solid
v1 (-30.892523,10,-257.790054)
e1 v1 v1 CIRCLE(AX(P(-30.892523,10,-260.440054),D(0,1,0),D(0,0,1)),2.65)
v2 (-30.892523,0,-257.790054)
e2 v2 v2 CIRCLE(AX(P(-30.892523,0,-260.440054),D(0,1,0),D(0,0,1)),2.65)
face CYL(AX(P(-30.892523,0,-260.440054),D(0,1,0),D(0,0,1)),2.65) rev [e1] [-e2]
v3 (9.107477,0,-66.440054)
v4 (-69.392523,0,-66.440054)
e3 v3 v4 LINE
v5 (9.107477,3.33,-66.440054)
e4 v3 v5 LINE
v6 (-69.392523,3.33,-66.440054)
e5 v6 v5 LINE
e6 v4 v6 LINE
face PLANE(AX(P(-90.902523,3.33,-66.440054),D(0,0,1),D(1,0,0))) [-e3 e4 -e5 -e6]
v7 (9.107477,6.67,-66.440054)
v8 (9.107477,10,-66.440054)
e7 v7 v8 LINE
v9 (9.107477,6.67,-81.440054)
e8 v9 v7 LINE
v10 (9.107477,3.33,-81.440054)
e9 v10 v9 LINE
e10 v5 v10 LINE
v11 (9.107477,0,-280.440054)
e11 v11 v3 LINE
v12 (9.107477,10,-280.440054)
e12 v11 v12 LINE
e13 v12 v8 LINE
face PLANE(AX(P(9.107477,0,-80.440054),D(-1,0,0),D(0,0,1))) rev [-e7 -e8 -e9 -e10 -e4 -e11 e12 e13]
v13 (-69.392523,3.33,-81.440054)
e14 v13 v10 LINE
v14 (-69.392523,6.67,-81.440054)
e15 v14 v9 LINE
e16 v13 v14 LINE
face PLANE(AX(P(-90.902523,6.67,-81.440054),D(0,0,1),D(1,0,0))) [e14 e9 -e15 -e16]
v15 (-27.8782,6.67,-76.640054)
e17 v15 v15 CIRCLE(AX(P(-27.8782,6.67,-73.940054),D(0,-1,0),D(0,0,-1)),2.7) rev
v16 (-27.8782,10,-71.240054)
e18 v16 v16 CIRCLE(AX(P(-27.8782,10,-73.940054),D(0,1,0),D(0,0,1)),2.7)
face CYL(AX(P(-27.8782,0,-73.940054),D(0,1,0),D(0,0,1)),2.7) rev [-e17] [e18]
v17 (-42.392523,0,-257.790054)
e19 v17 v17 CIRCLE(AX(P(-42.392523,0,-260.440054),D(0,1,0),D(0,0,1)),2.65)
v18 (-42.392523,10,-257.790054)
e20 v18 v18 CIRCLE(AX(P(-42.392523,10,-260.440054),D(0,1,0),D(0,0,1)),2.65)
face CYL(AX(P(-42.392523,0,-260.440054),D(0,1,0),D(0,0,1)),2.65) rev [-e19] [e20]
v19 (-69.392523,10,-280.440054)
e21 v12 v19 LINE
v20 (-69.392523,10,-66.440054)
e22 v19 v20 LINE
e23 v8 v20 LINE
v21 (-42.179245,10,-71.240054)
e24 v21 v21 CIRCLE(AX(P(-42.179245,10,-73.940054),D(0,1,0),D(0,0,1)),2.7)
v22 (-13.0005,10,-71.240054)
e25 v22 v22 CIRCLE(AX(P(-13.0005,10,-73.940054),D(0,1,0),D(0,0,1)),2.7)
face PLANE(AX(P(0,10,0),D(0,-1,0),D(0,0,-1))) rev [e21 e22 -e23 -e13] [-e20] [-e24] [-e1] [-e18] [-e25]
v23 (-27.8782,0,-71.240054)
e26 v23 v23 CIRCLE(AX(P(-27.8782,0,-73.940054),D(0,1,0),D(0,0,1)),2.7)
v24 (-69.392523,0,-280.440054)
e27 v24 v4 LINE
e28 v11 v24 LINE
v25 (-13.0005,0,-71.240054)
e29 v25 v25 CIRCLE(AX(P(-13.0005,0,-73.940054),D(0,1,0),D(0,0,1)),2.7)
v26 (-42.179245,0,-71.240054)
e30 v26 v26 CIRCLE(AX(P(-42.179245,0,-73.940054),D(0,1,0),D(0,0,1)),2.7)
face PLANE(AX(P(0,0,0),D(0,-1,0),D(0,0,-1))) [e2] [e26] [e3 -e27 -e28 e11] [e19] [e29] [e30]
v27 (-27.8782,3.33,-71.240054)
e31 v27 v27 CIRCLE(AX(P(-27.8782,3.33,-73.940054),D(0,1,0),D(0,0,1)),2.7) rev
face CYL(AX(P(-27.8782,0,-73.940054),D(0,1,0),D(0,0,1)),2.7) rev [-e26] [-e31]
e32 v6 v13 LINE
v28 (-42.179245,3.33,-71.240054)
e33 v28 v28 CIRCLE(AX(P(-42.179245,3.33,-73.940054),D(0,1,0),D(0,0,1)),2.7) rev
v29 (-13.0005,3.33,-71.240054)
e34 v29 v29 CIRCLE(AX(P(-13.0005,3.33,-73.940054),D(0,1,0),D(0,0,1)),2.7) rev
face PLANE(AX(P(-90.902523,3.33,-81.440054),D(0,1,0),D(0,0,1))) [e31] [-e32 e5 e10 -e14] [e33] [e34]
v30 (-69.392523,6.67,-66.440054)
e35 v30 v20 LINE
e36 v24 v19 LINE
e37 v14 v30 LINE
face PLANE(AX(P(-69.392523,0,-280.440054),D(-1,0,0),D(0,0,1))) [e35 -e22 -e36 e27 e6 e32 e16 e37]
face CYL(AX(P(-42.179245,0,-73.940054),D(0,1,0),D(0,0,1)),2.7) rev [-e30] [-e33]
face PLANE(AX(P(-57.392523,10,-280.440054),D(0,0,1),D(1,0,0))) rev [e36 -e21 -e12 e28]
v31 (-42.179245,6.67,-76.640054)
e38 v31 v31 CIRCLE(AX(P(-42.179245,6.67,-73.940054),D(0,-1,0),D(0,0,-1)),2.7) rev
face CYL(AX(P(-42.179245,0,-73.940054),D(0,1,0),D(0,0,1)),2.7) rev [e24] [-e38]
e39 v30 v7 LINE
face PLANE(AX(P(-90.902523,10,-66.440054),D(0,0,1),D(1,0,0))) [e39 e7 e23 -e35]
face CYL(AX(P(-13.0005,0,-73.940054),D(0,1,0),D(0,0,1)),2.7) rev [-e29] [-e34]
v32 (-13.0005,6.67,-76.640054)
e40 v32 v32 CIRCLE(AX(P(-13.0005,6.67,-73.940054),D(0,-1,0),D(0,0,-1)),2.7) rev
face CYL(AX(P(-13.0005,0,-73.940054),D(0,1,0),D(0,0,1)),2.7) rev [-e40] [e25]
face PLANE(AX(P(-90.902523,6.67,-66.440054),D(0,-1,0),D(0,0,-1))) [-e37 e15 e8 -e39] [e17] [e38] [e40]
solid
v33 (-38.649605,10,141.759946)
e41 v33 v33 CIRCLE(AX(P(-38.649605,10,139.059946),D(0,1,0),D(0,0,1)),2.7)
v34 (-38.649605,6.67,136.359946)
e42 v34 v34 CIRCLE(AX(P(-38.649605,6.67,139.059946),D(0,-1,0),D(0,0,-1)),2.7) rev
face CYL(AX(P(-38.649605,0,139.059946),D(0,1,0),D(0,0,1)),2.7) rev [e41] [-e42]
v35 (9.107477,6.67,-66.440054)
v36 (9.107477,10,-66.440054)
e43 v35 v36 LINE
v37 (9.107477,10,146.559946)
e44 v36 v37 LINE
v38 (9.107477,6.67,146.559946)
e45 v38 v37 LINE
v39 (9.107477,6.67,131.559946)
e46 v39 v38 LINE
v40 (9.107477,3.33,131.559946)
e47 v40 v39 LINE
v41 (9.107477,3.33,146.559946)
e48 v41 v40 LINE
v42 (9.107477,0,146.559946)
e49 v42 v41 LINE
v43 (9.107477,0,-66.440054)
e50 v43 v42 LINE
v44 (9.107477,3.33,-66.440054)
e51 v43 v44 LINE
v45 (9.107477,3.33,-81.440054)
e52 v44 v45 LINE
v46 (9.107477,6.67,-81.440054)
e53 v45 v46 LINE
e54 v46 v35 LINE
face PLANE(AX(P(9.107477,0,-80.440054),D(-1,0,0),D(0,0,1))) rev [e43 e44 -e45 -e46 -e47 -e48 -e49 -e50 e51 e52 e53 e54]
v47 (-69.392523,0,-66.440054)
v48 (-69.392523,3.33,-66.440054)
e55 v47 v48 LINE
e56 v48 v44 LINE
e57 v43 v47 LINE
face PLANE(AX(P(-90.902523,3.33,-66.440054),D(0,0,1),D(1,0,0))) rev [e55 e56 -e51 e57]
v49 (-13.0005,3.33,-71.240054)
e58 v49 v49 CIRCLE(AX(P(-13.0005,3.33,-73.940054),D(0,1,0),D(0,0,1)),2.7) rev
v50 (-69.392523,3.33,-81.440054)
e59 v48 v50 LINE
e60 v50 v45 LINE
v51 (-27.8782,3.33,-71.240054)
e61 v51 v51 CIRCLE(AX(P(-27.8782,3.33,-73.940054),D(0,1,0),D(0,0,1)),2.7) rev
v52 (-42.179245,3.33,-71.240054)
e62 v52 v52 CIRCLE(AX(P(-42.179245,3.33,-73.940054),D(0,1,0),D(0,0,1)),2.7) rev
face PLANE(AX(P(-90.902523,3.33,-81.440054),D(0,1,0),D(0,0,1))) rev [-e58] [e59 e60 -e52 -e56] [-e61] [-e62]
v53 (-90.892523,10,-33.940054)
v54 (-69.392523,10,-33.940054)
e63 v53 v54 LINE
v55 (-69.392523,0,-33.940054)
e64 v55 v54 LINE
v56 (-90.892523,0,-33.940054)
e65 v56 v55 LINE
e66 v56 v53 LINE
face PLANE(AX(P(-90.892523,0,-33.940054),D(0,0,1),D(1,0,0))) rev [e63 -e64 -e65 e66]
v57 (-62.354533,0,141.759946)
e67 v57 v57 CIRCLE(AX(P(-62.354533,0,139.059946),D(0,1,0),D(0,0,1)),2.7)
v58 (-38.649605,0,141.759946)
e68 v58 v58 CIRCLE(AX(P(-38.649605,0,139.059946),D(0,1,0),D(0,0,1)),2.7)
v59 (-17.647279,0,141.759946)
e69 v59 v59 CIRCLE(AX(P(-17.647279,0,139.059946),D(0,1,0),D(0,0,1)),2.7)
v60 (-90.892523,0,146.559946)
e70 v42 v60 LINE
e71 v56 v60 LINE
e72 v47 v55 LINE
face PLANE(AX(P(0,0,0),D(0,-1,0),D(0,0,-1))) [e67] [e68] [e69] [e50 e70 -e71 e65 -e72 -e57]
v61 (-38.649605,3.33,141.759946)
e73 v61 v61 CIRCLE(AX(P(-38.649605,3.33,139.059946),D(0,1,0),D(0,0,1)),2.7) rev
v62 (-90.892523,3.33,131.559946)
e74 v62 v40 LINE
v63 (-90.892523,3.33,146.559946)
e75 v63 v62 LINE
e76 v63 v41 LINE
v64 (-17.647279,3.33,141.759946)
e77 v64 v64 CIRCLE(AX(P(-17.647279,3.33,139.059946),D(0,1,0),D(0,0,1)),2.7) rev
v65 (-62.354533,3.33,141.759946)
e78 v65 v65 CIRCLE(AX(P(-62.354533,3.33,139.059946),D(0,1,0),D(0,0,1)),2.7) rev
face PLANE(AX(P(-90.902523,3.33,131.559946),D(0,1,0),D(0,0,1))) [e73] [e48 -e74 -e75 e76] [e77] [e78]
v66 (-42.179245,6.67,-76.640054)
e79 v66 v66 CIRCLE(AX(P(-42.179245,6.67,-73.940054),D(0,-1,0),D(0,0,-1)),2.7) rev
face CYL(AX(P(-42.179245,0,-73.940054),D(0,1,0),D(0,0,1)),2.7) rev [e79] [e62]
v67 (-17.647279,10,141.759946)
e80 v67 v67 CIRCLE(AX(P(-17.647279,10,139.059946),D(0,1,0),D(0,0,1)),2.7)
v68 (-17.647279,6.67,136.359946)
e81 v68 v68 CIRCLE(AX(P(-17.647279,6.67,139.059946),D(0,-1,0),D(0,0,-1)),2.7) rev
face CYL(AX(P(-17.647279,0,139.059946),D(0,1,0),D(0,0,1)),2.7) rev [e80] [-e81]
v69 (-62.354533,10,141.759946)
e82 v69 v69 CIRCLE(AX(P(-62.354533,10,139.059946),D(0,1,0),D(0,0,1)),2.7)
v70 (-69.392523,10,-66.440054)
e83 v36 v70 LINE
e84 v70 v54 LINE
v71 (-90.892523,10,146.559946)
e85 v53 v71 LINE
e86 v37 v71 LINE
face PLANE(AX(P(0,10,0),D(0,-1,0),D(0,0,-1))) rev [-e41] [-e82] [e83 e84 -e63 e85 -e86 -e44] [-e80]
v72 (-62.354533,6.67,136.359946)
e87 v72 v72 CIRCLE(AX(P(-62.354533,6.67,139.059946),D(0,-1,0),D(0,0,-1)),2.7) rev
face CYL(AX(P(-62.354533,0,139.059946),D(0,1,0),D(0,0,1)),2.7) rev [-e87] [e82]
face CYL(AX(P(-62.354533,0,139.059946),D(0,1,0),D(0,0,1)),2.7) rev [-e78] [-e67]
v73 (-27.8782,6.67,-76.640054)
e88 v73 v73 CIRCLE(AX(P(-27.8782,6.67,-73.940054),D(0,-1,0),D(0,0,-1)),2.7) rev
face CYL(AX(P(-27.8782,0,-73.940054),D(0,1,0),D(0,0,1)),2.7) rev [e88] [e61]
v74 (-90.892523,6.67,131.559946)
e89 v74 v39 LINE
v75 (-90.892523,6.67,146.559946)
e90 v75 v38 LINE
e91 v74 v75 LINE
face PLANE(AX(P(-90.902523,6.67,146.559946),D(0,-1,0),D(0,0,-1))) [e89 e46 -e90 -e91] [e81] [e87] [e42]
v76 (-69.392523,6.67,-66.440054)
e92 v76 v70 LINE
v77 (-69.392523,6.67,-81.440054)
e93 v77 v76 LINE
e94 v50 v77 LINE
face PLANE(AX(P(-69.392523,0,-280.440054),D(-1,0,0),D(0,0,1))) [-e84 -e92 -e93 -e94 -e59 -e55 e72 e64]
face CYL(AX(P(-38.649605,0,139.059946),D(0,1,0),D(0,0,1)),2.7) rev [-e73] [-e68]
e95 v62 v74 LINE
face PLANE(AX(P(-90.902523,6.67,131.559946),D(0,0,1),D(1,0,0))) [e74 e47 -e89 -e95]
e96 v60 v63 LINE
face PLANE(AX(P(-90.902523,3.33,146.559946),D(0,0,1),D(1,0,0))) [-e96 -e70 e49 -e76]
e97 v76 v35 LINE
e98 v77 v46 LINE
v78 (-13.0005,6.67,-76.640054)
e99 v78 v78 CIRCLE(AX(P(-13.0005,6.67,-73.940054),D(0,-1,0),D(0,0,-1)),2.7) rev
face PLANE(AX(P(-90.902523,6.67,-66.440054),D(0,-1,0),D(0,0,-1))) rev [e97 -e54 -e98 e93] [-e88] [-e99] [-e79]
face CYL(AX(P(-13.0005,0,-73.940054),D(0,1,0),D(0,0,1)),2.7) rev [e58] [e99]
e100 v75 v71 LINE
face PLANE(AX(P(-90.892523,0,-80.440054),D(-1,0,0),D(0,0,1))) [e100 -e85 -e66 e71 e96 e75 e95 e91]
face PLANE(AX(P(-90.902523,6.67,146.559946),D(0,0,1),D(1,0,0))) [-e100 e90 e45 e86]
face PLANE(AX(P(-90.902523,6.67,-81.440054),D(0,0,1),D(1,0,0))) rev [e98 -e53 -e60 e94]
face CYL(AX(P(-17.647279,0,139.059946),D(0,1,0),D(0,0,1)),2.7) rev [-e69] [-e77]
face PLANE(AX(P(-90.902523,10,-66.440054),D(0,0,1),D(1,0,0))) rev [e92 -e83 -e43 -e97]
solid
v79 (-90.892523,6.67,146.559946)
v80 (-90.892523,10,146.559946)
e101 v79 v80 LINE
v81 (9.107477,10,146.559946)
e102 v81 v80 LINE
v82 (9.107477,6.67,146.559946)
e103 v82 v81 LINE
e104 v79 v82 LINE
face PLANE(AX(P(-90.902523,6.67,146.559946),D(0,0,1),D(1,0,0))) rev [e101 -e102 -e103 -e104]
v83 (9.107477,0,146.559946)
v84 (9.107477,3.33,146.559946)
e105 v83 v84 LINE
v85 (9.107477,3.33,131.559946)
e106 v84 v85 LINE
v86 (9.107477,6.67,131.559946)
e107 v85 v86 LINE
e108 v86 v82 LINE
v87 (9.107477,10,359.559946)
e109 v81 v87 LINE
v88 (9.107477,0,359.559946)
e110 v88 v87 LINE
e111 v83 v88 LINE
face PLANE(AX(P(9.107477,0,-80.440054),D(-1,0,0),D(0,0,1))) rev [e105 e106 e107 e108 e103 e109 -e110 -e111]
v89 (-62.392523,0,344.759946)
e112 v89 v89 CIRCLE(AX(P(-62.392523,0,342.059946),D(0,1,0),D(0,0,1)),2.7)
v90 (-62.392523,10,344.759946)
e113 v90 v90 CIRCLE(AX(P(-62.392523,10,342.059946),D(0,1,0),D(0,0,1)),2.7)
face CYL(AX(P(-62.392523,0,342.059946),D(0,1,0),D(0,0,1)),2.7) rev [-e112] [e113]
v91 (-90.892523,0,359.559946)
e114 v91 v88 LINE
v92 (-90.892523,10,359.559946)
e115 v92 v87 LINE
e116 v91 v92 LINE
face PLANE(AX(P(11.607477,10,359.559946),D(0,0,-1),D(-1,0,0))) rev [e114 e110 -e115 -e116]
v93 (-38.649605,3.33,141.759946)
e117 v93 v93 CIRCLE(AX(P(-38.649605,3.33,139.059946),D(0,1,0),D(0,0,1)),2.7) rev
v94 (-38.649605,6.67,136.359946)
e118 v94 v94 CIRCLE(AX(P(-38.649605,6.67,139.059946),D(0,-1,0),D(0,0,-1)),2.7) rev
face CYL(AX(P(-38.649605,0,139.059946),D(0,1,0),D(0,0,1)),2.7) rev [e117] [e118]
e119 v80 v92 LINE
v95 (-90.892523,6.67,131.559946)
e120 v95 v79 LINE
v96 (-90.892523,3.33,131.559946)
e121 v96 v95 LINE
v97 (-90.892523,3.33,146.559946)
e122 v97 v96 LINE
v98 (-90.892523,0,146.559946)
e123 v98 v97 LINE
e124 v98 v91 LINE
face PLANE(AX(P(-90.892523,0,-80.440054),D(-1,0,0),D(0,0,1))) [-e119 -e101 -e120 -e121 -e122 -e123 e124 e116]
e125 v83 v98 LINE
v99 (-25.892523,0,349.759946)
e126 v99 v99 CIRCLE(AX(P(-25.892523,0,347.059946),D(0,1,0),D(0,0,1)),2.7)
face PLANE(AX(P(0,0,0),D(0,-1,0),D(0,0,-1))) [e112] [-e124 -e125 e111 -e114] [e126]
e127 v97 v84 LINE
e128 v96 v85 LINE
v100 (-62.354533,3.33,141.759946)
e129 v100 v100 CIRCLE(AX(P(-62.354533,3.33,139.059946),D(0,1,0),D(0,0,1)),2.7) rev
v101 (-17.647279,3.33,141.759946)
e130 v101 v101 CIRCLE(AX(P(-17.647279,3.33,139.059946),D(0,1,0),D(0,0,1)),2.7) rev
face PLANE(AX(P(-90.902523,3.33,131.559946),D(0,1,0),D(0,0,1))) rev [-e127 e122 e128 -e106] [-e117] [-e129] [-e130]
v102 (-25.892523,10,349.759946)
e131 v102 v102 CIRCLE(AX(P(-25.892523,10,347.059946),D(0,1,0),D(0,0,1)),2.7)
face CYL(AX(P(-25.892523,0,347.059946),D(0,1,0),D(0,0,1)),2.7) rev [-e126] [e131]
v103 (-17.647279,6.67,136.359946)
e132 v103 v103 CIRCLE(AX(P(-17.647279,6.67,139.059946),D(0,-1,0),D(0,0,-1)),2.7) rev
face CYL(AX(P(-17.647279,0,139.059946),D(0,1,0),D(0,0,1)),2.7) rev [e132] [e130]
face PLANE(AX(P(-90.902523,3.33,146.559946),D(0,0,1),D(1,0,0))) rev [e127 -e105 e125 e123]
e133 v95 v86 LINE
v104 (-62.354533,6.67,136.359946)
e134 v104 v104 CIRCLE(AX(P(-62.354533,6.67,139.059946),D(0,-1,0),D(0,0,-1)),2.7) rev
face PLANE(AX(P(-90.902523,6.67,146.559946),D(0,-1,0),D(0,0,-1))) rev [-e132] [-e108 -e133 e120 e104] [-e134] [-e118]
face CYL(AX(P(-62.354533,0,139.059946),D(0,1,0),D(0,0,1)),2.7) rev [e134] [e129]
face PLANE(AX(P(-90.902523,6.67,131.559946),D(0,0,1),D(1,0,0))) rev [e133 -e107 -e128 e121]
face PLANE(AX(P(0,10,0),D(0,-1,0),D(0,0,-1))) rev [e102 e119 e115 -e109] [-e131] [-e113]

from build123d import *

# Parameters (mm, degrees)
BOSS_EXTRUDE1_DEPTH     = 10
CUT_EXTRUDE1_DEPTH      = 371.163218123
CUT_EXTRUDE1_DEPTH_BACK = 371.163218123
SKETCH2_W               = 11.607476636
SKETCH2_H               = 200
SKETCH3_W               = 10
SKETCH3_H               = 200
BOSS_EXTRUDE2_DEPTH     = 10
SKETCH4_W               = 1.61
SKETCH4_H               = 200
BOSS_EXTRUDE3_DEPTH     = 10
CUT_EXTRUDE2_DEPTH      = 371.163218123
CUT_EXTRUDE2_DEPTH_BACK = 371.163218123
SKETCH6_W               = 2.5
SKETCH6_H               = 200
SKETCH6_H_2             = 440
SKETCH7_W               = 9.997476636
SKETCH7_H               = 200
BOSS_EXTRUDE4_DEPTH     = 10
SKETCH8_W               = 40
SKETCH8_H               = 100
BOSS_EXTRUDE5_DEPTH     = 10
SKETCH9_W               = 2
SKETCH9_H               = 200
SKETCH9_W_2             = 3.5
SKETCH9_H_2             = 440
BOSS_EXTRUDE6_DEPTH     = 10
CUT_EXTRUDE3_DEPTH      = 372.00512896
CUT_EXTRUDE3_DEPTH_BACK = 372.00512896
SKETCH10_W              = 21.5
SKETCH10_H              = 46.5
CUT_EXTRUDE4_DEPTH      = 372.00512896
CUT_EXTRUDE4_DEPTH_BACK = 372.00512896
SKETCH11_R              = 2.65
SKETCH12_R              = 2.7
CUT_EXTRUDE5_DEPTH      = 372.00512896
SKETCH15_R              = 2.7
CUT_EXTRUDE6_DEPTH      = 372.00512896
SPLIT1_OUTLINE_W        = 78.5
SPLIT1_OUTLINE_H        = 199
SPLIT1_OUTLINE_R        = 2.65
SPLIT1_DEPTH            = 10
SPLIT1_2_OUTLINE_W      = 78.5
SPLIT1_2_OUTLINE_H      = 15
SPLIT1_2_OUTLINE_R      = 2.7
SPLIT1_2_DEPTH          = 3.33
SPLIT1_START            = 6.67
SPLIT1_3_OUTLINE_W      = 78.5
SPLIT1_3_OUTLINE_H      = 15
SPLIT1_3_OUTLINE_R      = 2.7
SPLIT1_3_DEPTH          = 3.33
SPLIT1_4_DEPTH          = 10
SPLIT1_5_OUTLINE_W      = 100
SPLIT1_5_OUTLINE_H      = 15
SPLIT1_5_OUTLINE_R      = 2.7
SPLIT1_5_DEPTH          = 3.33
SPLIT1_6_OUTLINE_W      = 100
SPLIT1_6_OUTLINE_H      = 15
SPLIT1_6_OUTLINE_R      = 2.7
SPLIT1_6_DEPTH          = 3.33
SPLIT1_START_2          = 3.33
SPLIT1_7_OUTLINE_W      = 78.5
SPLIT1_7_OUTLINE_H      = 15
SPLIT1_7_OUTLINE_R      = 2.7
SPLIT1_7_DEPTH          = 3.34
SPLIT1_8_OUTLINE_R      = 2.7
SPLIT1_8_OUTLINE_R_2    = 2.65
SPLIT1_8_DEPTH          = 10
SPLIT1_9_OUTLINE_W      = 100
SPLIT1_9_OUTLINE_H      = 15
SPLIT1_9_OUTLINE_R      = 2.7
SPLIT1_9_DEPTH          = 3.33
SPLIT1_10_OUTLINE_W     = 100
SPLIT1_10_OUTLINE_H     = 15
SPLIT1_10_OUTLINE_R     = 2.7
SPLIT1_10_DEPTH         = 3.33


# Read off the part's stored shape, not the designer's step: Split1
with BuildPart() as part:
    # Sketch1 → Boss-Extrude1 (new body)
    with BuildSketch(Plane(origin=(0, 0, 0), x_dir=(1, 0, 0), z_dir=(0, 1, 0))):
        Polygon((-57.392523364, 280.440053801), (11.607476636, 280.440053801), (11.607476636, 80.440053801), (11.607476636, -259.559946199), (11.607476636, -359.559946199), (-47.392523364, -359.559946199), (-47.392523364, -259.559946199), (-87.392523364, -259.559946199), (-87.392523364, 80.440053801), (-57.392523364, 80.440053801), align=None)
    extrude(amount=BOSS_EXTRUDE1_DEPTH)

    # Sketch2 → Cut-Extrude1 (cut, two sides: drawn at the far end of the back side and taken through both)
    with BuildSketch(Plane(origin=(0, 10, 0), x_dir=(1, 0, 0), z_dir=(0, 1, 0)).offset(-CUT_EXTRUDE1_DEPTH_BACK)):
        with Locations((5.803738318, 180.440053801)):
            Rectangle(SKETCH2_W, SKETCH2_H)
    extrude(amount=CUT_EXTRUDE1_DEPTH + CUT_EXTRUDE1_DEPTH_BACK, mode=Mode.SUBTRACT)

    # Sketch3 → Boss-Extrude2 (add)
    with BuildSketch(Plane(origin=(0, 10, 0), x_dir=(1, 0, 0), z_dir=(0, 1, 0))):
        with Locations((-62.392523364, 180.440053801)):
            Rectangle(SKETCH3_W, SKETCH3_H)
    extrude(amount=-BOSS_EXTRUDE2_DEPTH)

    # Sketch4 → Boss-Extrude3 (add)
    with BuildSketch(Plane(origin=(0, 10, 0), x_dir=(1, 0, 0), z_dir=(0, 1, 0))):
        with Locations((0.805, 180.440053801)):
            Rectangle(SKETCH4_W, SKETCH4_H)
    extrude(amount=-BOSS_EXTRUDE3_DEPTH)

    # Sketch6 → Cut-Extrude2 (cut, two sides: drawn at the far end of the back side and taken through both)
    with BuildSketch(Plane(origin=(0, 10, 0), x_dir=(1, 0, 0), z_dir=(0, 1, 0)).offset(-CUT_EXTRUDE2_DEPTH_BACK)):
        with Locations((0.36, 180.440053801)):
            Rectangle(SKETCH6_W, SKETCH6_H)
        with Locations((10.357476636, -139.559946199)):
            Rectangle(SKETCH6_W, SKETCH6_H_2)
    extrude(amount=CUT_EXTRUDE2_DEPTH + CUT_EXTRUDE2_DEPTH_BACK, mode=Mode.SUBTRACT)

    # Sketch7 → Boss-Extrude4 (add)
    with BuildSketch(Plane(origin=(0, 10, 0), x_dir=(1, 0, 0), z_dir=(0, 1, 0))):
        with Locations((4.108738318, 180.440053801)):
            Rectangle(SKETCH7_W, SKETCH7_H)
    extrude(amount=-BOSS_EXTRUDE4_DEPTH)

    # Sketch8 → Boss-Extrude5 (add)
    with BuildSketch(Plane(origin=(0, 10, 0), x_dir=(1, 0, 0), z_dir=(0, 1, 0))):
        with Locations((-67.392523364, -309.559946199)):
            Rectangle(SKETCH8_W, SKETCH8_H)
    extrude(amount=-BOSS_EXTRUDE5_DEPTH)

    # Sketch9 → Boss-Extrude6 (add)
    with BuildSketch(Plane(origin=(0, 10, 0), x_dir=(1, 0, 0), z_dir=(0, 1, 0))):
        with Locations((-68.392523364, 180.440053801)):
            Rectangle(SKETCH9_W, SKETCH9_H)
        with Locations((-89.142523364, -139.559946199)):
            Rectangle(SKETCH9_W_2, SKETCH9_H_2)
    extrude(amount=-BOSS_EXTRUDE6_DEPTH)

    # Sketch10 → Cut-Extrude3 (cut, two sides: drawn at the far end of the back side and taken through both)
    with BuildSketch(Plane(origin=(0, 10, 0), x_dir=(1, 0, 0), z_dir=(0, 1, 0)).offset(-CUT_EXTRUDE3_DEPTH_BACK)):
        with Locations((-80.142523364, 57.190053801)):
            Rectangle(SKETCH10_W, SKETCH10_H)
    extrude(amount=CUT_EXTRUDE3_DEPTH + CUT_EXTRUDE3_DEPTH_BACK, mode=Mode.SUBTRACT)

    # Sketch11 → Cut-Extrude4 (cut, two sides: drawn at the far end of the back side and taken through both)
    with BuildSketch(Plane(origin=(0, 10, 0), x_dir=(1, 0, 0), z_dir=(0, 1, 0)).offset(-CUT_EXTRUDE4_DEPTH_BACK)):
        with Locations(Location((-42.392523364, 260.440053801, 0), (0, 0, 270))):
            Circle(SKETCH11_R)
        with Locations(Location((-30.892523364, 260.440053801, 0), (0, 0, 270))):
            Circle(SKETCH11_R)
    extrude(amount=CUT_EXTRUDE4_DEPTH + CUT_EXTRUDE4_DEPTH_BACK, mode=Mode.SUBTRACT)

    # Sketch12 → Cut-Extrude5 (cut, through all)
    with BuildSketch(Plane(origin=(0, 10, 0), x_dir=(1, 0, 0), z_dir=(0, 1, 0))):
        with Locations(Location((-62.392523364, -342.059946199, 0), (0, 0, 270))):
            Circle(SKETCH12_R)
        with Locations(Location((-25.892523364, -347.059946199, 0), (0, 0, 270))):
            Circle(SKETCH12_R)
    extrude(amount=-CUT_EXTRUDE5_DEPTH, mode=Mode.SUBTRACT)

    # Sketch15 → Cut-Extrude6 (cut, through all)
    with BuildSketch(Plane(origin=(0, 10, 0), x_dir=(1, 0, 0), z_dir=(0, 1, 0))):
        with Locations(Location((-17.647279198, -139.059946199, 0), (0, 0, 270))):
            Circle(SKETCH15_R)
        with Locations(Location((-62.354533308, -139.059946199, 0), (0, 0, 270))):
            Circle(SKETCH15_R)
        with Locations(Location((-42.179244707, 73.940053801, 0), (0, 0, 270))):
            Circle(SKETCH15_R)
        with Locations(Location((-13.000500169, 73.940053801, 0), (0, 0, 270))):
            Circle(SKETCH15_R)
        with Locations(Location((-27.878199953, 73.940053801, 0), (0, 0, 270))):
            Circle(SKETCH15_R)
        with Locations(Location((-38.649605083, -139.059946199, 0), (0, 0, 270))):
            Circle(SKETCH15_R)
    extrude(amount=-CUT_EXTRUDE6_DEPTH, mode=Mode.SUBTRACT)

    # Split1 8 outline → Split1 8 (cut)
    with BuildSketch(Plane(origin=(0, 0, 0), x_dir=(1, 0, 0), z_dir=(0, 1, 0))):
        Polygon((-90.892523364, 33.940053801), (-90.892523364, -131.559946199), (9.107476636, -131.559946199), (9.107476636, 280.440053801), (-69.392523364, 280.440053801), (-69.392523364, 33.940053801), align=None)
        with Locations((-42.179244707, 73.940053801)):
            Circle(SPLIT1_8_OUTLINE_R, mode=Mode.SUBTRACT)
        with Locations((-42.392523364, 260.440053801)):
            Circle(SPLIT1_8_OUTLINE_R_2, mode=Mode.SUBTRACT)
        with Locations((-27.878199953, 73.940053801)):
            Circle(SPLIT1_8_OUTLINE_R, mode=Mode.SUBTRACT)
        with Locations((-13.000500169, 73.940053801)):
            Circle(SPLIT1_8_OUTLINE_R, mode=Mode.SUBTRACT)
        with Locations((-30.892523364, 260.440053801)):
            Circle(SPLIT1_8_OUTLINE_R_2, mode=Mode.SUBTRACT)
    extrude(amount=SPLIT1_8_DEPTH, mode=Mode.SUBTRACT)

    # Split1 9 outline → Split1 9 (cut)
    with BuildSketch(Plane(origin=(0, 0, 0), x_dir=(1, 0, 0), z_dir=(0, 1, 0))):
        with Locations((-40.892523364, -139.059946199)):
            Rectangle(SPLIT1_9_OUTLINE_W, SPLIT1_9_OUTLINE_H)
        with Locations((-62.354533308, -139.059946199)):
            Circle(SPLIT1_9_OUTLINE_R, mode=Mode.SUBTRACT)
        with Locations((-38.649605083, -139.059946199)):
            Circle(SPLIT1_9_OUTLINE_R, mode=Mode.SUBTRACT)
        with Locations((-17.647279198, -139.059946199)):
            Circle(SPLIT1_9_OUTLINE_R, mode=Mode.SUBTRACT)
    extrude(amount=SPLIT1_9_DEPTH, mode=Mode.SUBTRACT)

    # Split1 10 outline → Split1 10 (cut)
    with BuildSketch(Plane(origin=(0, 0, 0), x_dir=(1, 0, 0), z_dir=(0, 1, 0)).offset(SPLIT1_START)):
        with Locations((-40.892523364, -139.059946199)):
            Rectangle(SPLIT1_10_OUTLINE_W, SPLIT1_10_OUTLINE_H)
        with Locations((-62.354533308, -139.059946199)):
            Circle(SPLIT1_10_OUTLINE_R, mode=Mode.SUBTRACT)
        with Locations((-38.649605083, -139.059946199)):
            Circle(SPLIT1_10_OUTLINE_R, mode=Mode.SUBTRACT)
        with Locations((-17.647279198, -139.059946199)):
            Circle(SPLIT1_10_OUTLINE_R, mode=Mode.SUBTRACT)
    extrude(amount=SPLIT1_10_DEPTH, mode=Mode.SUBTRACT)


with BuildPart() as body_2:
    # Split1 outline → Split1 (new body)
    with BuildSketch(Plane(origin=(0, 0, 0), x_dir=(1, 0, 0), z_dir=(0, 1, 0))):
        with Locations((-30.142523364, 180.940053801)):
            Rectangle(SPLIT1_OUTLINE_W, SPLIT1_OUTLINE_H)
        with Locations((-42.392523364, 260.440053801)):
            Circle(SPLIT1_OUTLINE_R, mode=Mode.SUBTRACT)
        with Locations((-30.892523364, 260.440053801)):
            Circle(SPLIT1_OUTLINE_R, mode=Mode.SUBTRACT)
    extrude(amount=SPLIT1_DEPTH)

    # Split1 2 outline → Split1 2 (add)
    with BuildSketch(Plane(origin=(0, 0, 0), x_dir=(1, 0, 0), z_dir=(0, 1, 0))):
        with Locations((-30.142523364, 73.940053801)):
            Rectangle(SPLIT1_2_OUTLINE_W, SPLIT1_2_OUTLINE_H)
        with Locations((-42.179244707, 73.940053801)):
            Circle(SPLIT1_2_OUTLINE_R, mode=Mode.SUBTRACT)
        with Locations((-27.878199953, 73.940053801)):
            Circle(SPLIT1_2_OUTLINE_R, mode=Mode.SUBTRACT)
        with Locations((-13.000500169, 73.940053801)):
            Circle(SPLIT1_2_OUTLINE_R, mode=Mode.SUBTRACT)
    extrude(amount=SPLIT1_2_DEPTH)

    # Split1 3 outline → Split1 3 (add)
    with BuildSketch(Plane(origin=(0, 0, 0), x_dir=(1, 0, 0), z_dir=(0, 1, 0)).offset(SPLIT1_START)):
        with Locations((-30.142523364, 73.940053801)):
            Rectangle(SPLIT1_3_OUTLINE_W, SPLIT1_3_OUTLINE_H)
        with Locations((-42.179244707, 73.940053801)):
            Circle(SPLIT1_3_OUTLINE_R, mode=Mode.SUBTRACT)
        with Locations((-27.878199953, 73.940053801)):
            Circle(SPLIT1_3_OUTLINE_R, mode=Mode.SUBTRACT)
        with Locations((-13.000500169, 73.940053801)):
            Circle(SPLIT1_3_OUTLINE_R, mode=Mode.SUBTRACT)
    extrude(amount=SPLIT1_3_DEPTH)


with BuildPart() as body_3:
    # Split1 4 outline → Split1 4 (new body)
    with BuildSketch(Plane(origin=(0, 0, 0), x_dir=(1, 0, 0), z_dir=(0, 1, 0))):
        Polygon((9.107476636, 66.440053801), (-69.392523364, 66.440053801), (-69.392523364, 33.940053801), (-90.892523364, 33.940053801), (-90.892523364, -131.559946199), (9.107476636, -131.559946199), align=None)
    extrude(amount=SPLIT1_4_DEPTH)

    # Split1 5 outline → Split1 5 (add)
    with BuildSketch(Plane(origin=(0, 0, 0), x_dir=(1, 0, 0), z_dir=(0, 1, 0))):
        with Locations((-40.892523364, -139.059946199)):
            Rectangle(SPLIT1_5_OUTLINE_W, SPLIT1_5_OUTLINE_H)
        with Locations((-62.354533308, -139.059946199)):
            Circle(SPLIT1_5_OUTLINE_R, mode=Mode.SUBTRACT)
        with Locations((-38.649605083, -139.059946199)):
            Circle(SPLIT1_5_OUTLINE_R, mode=Mode.SUBTRACT)
        with Locations((-17.647279198, -139.059946199)):
            Circle(SPLIT1_5_OUTLINE_R, mode=Mode.SUBTRACT)
    extrude(amount=SPLIT1_5_DEPTH)

    # Split1 6 outline → Split1 6 (add)
    with BuildSketch(Plane(origin=(0, 0, 0), x_dir=(1, 0, 0), z_dir=(0, 1, 0)).offset(SPLIT1_START)):
        with Locations((-40.892523364, -139.059946199)):
            Rectangle(SPLIT1_6_OUTLINE_W, SPLIT1_6_OUTLINE_H)
        with Locations((-62.354533308, -139.059946199)):
            Circle(SPLIT1_6_OUTLINE_R, mode=Mode.SUBTRACT)
        with Locations((-38.649605083, -139.059946199)):
            Circle(SPLIT1_6_OUTLINE_R, mode=Mode.SUBTRACT)
        with Locations((-17.647279198, -139.059946199)):
            Circle(SPLIT1_6_OUTLINE_R, mode=Mode.SUBTRACT)
    extrude(amount=SPLIT1_6_DEPTH)

    # Split1 7 outline → Split1 7 (add)
    with BuildSketch(Plane(origin=(0, 0, 0), x_dir=(1, 0, 0), z_dir=(0, 1, 0)).offset(SPLIT1_START_2)):
        with Locations((-30.142523364, 73.940053801)):
            Rectangle(SPLIT1_7_OUTLINE_W, SPLIT1_7_OUTLINE_H)
        with Locations((-42.179244707, 73.940053801)):
            Circle(SPLIT1_7_OUTLINE_R, mode=Mode.SUBTRACT)
        with Locations((-27.878199953, 73.940053801)):
            Circle(SPLIT1_7_OUTLINE_R, mode=Mode.SUBTRACT)
        with Locations((-13.000500169, 73.940053801)):
            Circle(SPLIT1_7_OUTLINE_R, mode=Mode.SUBTRACT)
    extrude(amount=SPLIT1_7_DEPTH)


solid = Compound([part.part, body_2.part, body_3.part])
